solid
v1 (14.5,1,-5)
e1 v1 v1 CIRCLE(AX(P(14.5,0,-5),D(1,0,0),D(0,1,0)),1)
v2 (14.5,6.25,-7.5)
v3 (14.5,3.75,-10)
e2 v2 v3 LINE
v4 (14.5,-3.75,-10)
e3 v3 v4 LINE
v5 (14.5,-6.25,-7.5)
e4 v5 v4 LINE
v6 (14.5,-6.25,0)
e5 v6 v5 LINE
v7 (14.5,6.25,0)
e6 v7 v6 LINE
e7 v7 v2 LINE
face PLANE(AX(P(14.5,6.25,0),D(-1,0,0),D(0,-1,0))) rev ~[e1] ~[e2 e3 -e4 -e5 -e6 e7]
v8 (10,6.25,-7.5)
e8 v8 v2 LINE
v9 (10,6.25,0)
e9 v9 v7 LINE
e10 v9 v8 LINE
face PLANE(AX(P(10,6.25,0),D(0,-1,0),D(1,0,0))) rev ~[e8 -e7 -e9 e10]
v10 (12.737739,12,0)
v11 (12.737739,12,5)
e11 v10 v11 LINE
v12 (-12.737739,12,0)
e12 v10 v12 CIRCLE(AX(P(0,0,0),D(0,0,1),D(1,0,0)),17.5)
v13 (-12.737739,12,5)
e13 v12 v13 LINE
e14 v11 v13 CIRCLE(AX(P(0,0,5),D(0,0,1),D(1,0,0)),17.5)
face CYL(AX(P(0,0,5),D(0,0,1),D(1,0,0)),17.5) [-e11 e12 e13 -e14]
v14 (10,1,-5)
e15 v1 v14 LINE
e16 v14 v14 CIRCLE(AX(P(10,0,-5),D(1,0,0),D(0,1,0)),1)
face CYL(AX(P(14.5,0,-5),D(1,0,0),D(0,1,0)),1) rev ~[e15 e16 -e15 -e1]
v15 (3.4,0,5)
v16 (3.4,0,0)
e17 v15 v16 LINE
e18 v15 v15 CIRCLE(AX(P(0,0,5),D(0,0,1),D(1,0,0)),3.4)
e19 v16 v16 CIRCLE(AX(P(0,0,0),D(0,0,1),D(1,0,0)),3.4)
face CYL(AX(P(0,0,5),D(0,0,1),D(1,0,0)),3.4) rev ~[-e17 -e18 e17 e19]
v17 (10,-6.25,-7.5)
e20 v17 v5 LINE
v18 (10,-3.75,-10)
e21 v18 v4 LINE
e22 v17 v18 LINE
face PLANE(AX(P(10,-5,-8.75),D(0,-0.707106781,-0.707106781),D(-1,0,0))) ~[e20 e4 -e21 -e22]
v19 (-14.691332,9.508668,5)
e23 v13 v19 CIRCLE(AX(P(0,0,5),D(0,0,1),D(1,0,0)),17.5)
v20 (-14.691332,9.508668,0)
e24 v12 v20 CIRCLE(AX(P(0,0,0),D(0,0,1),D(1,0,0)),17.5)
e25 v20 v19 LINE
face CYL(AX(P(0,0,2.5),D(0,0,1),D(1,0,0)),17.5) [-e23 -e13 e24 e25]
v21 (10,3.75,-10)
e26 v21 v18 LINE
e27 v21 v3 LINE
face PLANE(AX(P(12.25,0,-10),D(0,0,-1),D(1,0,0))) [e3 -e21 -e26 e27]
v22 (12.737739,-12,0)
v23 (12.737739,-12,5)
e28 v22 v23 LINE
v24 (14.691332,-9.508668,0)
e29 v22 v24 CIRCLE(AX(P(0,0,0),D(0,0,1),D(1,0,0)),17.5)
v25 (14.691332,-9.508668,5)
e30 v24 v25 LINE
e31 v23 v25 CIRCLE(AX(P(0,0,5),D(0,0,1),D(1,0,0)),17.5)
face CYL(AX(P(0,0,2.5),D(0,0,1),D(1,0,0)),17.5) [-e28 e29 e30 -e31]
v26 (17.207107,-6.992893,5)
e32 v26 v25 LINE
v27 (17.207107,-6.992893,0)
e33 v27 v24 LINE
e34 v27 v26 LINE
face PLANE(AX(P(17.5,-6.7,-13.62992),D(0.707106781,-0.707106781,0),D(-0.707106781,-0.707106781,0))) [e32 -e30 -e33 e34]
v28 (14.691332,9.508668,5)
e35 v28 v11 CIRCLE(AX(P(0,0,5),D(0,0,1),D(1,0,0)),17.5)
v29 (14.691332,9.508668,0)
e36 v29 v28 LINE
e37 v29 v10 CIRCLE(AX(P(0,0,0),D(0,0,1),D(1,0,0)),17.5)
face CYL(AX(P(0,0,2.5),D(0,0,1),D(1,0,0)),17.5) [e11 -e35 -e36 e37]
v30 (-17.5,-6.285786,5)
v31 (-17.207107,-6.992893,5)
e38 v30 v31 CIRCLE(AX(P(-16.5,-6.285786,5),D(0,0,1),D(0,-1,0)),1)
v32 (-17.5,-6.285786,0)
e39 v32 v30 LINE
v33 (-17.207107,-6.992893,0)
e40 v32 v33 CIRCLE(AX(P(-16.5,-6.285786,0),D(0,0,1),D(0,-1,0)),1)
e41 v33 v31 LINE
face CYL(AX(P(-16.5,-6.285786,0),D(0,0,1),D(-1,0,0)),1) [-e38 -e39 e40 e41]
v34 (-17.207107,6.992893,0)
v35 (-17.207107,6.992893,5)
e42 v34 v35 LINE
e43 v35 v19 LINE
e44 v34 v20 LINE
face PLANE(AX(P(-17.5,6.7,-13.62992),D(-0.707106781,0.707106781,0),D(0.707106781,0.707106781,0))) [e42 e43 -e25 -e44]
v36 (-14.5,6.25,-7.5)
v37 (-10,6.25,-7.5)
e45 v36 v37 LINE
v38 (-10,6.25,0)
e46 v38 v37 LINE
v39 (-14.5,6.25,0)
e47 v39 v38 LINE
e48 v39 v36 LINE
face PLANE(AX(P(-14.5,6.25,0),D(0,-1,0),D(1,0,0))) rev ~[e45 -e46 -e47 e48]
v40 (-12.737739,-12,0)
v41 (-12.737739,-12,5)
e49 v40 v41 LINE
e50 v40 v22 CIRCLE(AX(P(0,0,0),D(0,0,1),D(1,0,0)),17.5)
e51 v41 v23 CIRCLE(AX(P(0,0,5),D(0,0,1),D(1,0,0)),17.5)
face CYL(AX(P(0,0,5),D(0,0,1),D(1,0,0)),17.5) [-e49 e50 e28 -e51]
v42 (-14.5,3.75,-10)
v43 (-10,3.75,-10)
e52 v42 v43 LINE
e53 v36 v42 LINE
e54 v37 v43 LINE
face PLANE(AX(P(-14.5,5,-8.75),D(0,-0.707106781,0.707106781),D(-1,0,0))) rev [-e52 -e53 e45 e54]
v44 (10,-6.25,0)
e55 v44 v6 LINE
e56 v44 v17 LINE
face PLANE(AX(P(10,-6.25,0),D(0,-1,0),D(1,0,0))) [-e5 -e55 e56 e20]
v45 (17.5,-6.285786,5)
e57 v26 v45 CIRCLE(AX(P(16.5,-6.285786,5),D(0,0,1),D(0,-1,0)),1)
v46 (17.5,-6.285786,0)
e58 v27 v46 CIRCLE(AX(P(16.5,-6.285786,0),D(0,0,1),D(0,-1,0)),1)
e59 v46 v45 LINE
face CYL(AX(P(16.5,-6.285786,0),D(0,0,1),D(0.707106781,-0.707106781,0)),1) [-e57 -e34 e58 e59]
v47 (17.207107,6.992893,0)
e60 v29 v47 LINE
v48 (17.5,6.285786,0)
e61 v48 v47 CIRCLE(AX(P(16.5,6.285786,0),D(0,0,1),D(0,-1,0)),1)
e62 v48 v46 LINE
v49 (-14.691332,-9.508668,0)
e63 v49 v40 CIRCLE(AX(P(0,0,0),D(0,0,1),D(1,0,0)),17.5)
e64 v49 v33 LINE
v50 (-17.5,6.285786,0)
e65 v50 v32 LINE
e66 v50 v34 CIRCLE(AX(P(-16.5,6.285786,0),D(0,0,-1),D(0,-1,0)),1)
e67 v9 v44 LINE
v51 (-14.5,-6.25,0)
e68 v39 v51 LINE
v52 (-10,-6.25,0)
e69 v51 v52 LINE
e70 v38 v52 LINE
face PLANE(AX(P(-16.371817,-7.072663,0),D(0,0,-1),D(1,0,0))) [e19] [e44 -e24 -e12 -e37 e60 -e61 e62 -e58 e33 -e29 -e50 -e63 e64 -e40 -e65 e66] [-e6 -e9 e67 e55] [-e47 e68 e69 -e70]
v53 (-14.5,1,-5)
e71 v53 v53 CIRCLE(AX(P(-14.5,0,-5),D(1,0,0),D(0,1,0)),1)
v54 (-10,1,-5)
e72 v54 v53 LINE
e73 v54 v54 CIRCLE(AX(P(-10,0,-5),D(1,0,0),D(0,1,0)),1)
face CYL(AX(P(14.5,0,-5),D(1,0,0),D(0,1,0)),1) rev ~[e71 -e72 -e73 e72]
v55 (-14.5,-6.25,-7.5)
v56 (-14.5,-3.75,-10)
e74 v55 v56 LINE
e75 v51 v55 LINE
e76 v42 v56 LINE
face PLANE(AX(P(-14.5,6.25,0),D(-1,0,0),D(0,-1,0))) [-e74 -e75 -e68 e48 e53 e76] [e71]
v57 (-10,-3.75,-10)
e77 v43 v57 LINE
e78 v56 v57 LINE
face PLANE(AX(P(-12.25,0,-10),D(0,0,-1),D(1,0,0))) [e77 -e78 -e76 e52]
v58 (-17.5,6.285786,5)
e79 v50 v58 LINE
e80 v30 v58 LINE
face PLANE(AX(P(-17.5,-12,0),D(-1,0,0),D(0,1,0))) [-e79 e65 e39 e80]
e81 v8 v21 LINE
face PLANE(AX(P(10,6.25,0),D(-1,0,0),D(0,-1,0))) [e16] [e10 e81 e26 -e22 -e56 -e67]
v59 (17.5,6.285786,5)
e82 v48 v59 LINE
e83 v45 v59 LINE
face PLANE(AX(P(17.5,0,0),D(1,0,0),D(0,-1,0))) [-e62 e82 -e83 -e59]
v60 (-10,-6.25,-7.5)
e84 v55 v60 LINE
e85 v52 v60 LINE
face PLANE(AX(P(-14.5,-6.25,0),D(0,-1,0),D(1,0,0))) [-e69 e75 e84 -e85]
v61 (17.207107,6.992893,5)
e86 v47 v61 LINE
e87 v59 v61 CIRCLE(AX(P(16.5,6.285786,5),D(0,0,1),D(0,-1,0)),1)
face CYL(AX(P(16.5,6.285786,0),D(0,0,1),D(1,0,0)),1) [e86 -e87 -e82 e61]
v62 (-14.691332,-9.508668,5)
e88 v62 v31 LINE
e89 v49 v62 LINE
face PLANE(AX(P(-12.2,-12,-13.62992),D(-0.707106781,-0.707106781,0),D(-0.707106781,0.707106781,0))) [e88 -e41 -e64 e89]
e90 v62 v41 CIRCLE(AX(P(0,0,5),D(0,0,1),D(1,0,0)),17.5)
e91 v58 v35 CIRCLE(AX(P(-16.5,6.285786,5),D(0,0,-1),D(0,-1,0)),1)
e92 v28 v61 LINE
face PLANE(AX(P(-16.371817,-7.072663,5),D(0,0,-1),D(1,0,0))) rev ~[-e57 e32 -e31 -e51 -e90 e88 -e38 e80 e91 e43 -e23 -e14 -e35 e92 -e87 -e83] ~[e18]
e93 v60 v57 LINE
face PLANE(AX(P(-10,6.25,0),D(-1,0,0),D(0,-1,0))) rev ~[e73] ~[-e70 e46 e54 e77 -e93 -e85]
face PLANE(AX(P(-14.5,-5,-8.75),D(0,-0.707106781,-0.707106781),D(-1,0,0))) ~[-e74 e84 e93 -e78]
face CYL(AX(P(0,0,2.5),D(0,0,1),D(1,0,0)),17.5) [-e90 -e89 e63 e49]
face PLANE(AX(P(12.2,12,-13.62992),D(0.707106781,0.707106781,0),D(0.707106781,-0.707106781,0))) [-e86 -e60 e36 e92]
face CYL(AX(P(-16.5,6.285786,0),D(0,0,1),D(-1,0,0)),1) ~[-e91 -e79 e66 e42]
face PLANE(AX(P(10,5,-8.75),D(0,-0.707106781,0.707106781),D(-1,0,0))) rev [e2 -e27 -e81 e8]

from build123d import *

# Parameters (mm, degrees)
F1_DEPTH      = 5
F3_SIZE       = 1
F2_W          = 4.5
F2_H          = 12.5
F4_DEPTH      = 10
F5_SIZE       = 2.5
F6_R          = 1
F7_DEPTH      = 39.5010001
F8_R          = 39.5864097355
F8_R_2        = 17.5
F9_DEPTH      = 25
F10_R         = 3.4
F11_DEPTH     = 25
F13_DEPTH     = 5
F14_T4_DEPTH  = 32.2598396724
F14_S5_R      = 17.5
F14_T6_DEPTH  = 18
F14_T10_DEPTH = 32.2598396724
F14_S11_R     = 17.5
F14_T12_DEPTH = 18
F14_T16_DEPTH = 32.2598396724
F14_S17_R     = 17.5
F14_T18_DEPTH = 18
F14_T22_DEPTH = 32.2598396724
F14_S23_R     = 17.5
F14_T24_DEPTH = 18
F15_R         = 1


# Not quite as in the source:
# - a fillet or chamfer that OpenCascade refuses, or shapes differently, is made with other operations: its cross-section is extruded or revolved along the edge and cut away or added


with BuildPart() as f1:
    # F0 (on Top) → F1 (new body)
    with BuildSketch(Plane.XY):
        with BuildLine():
            ThreePointArc((19.8625961196, -15.8301909188), (23.6080012184, -12.5093598908), (25, -7.7012087429))
            Line((25, -7.7012087429), (25, 7.7012087429))
            ThreePointArc((25, 7.7012087429), (23.6080012184, 12.5093598908), (19.8625961196, 15.8301909188))
            add(Edge.make_bspline(
                [(19.8625961196, 15.8301909188), (0, 25.2681728257), (-19.8625961196, 15.8301909188)],
                knots=[0.9132750433, 0.9132750433, 0.9132750433, 2.2283176103, 2.2283176103, 2.2283176103], degree=2, weights=[1, 0.7915095459, 1]))
            ThreePointArc((-19.8625961196, 15.8301909188), (-23.6080012184, 12.5093598908), (-25, 7.7012087429))
            Line((-25, 7.7012087429), (-25, -7.7012087429))
            ThreePointArc((-25, -7.7012087429), (-23.6080012184, -12.5093598908), (-19.8625961196, -15.8301909188))
            add(Edge.make_bspline(
                [(-19.8625961196, -15.8301909188), (0, -25.2681728257), (19.8625961196, -15.8301909188)],
                knots=[4.0548676969, 4.0548676969, 4.0548676969, 5.3699102639, 5.3699102639, 5.3699102639], degree=2, weights=[1, 0.7915095459, 1]))
        make_face()
    extrude(amount=F1_DEPTH)

    # F3
    f3_edges = [f1.edges().sort_by_distance(p)[0] for p in [
        (4e-06, -20, 0),
    ]]
    chamfer(f3_edges, length=F3_SIZE)

    # F2 (on face) → F4 (join)
    with BuildSketch(Plane(origin=(0, 0, 0), x_dir=(1, 0, 0), z_dir=(0, 0, -1))):
        with Locations((12.25, 0)):
            Rectangle(F2_W, F2_H)
        with Locations((-12.25, 0)):
            Rectangle(F2_W, F2_H)
    extrude(amount=F4_DEPTH)

    # F5
    f5_edges = [f1.edges().sort_by_distance(p)[0] for p in [
        (-12.25, -6.25, -10),
        (12.25, -6.25, -10),
        (-12.25, 6.25, -10),
        (12.25, 6.25, -10),
    ]]
    chamfer(f5_edges, length=F5_SIZE)

    # F6 (on face) → F7 (cut, through all)
    with BuildSketch(Plane.YZ.offset(14.5)):
        with Locations((0, -5)):
            Circle(F6_R)
    extrude(amount=-F7_DEPTH, mode=Mode.SUBTRACT)

    # F8 (on face) → F9 (cut)
    with BuildSketch(Plane.XY.offset(5)):
        Circle(F8_R)
        with BuildLine():
            add(Edge.make_bspline(
                [(-19.8625961196, -15.8301909188), (0, -25.2681728257), (19.8625961196, -15.8301909188)],
                knots=[4.0548676969, 4.0548676969, 4.0548676969, 5.3699102639, 5.3699102639, 5.3699102639], degree=2, weights=[1, 0.7915095459, 1]))
            ThreePointArc((-19.8625961196, -15.8301909188), (-23.6080012184, -12.5093598908), (-25, -7.7012087429))
            Line((-25, -7.7012087429), (-25, 7.7012087429))
            ThreePointArc((-25, 7.7012087429), (-23.6080012184, 12.5093598908), (-19.8625961196, 15.8301909188))
            add(Edge.make_bspline(
                [(19.8625961196, 15.8301909188), (0, 25.2681728257), (-19.8625961196, 15.8301909188)],
                knots=[0.9132750433, 0.9132750433, 0.9132750433, 2.2283176103, 2.2283176103, 2.2283176103], degree=2, weights=[1, 0.7915095459, 1]))
            ThreePointArc((19.8625961196, 15.8301909188), (23.6080012184, 12.5093598908), (25, 7.7012087429))
            Line((25, 7.7012087429), (25, -7.7012087429))
            ThreePointArc((25, -7.7012087429), (23.6080012184, -12.5093598908), (19.8625961196, -15.8301909188))
        make_face(mode=Mode.SUBTRACT)
        with BuildLine():
            ThreePointArc((-25, -7.7012087429), (-23.6080012184, -12.5093598908), (-19.8625961196, -15.8301909188))
            add(Edge.make_bspline(
                [(-19.8625961196, -15.8301909188), (0, -25.2681728257), (19.8625961196, -15.8301909188)],
                knots=[4.0548676969, 4.0548676969, 4.0548676969, 5.3699102639, 5.3699102639, 5.3699102639], degree=2, weights=[1, 0.7915095459, 1]))
            ThreePointArc((19.8625961196, -15.8301909188), (23.6080012184, -12.5093598908), (25, -7.7012087429))
            Line((25, -7.7012087429), (25, 7.7012087429))
            ThreePointArc((25, 7.7012087429), (23.6080012184, 12.5093598908), (19.8625961196, 15.8301909188))
            add(Edge.make_bspline(
                [(19.8625961196, 15.8301909188), (0, 25.2681728257), (-19.8625961196, 15.8301909188)],
                knots=[0.9132750433, 0.9132750433, 0.9132750433, 2.2283176103, 2.2283176103, 2.2283176103], degree=2, weights=[1, 0.7915095459, 1]))
            ThreePointArc((-19.8625961196, 15.8301909188), (-23.6080012184, 12.5093598908), (-25, 7.7012087429))
            Line((-25, 7.7012087429), (-25, -7.7012087429))
        make_face()
        Circle(F8_R_2, mode=Mode.SUBTRACT)
    extrude(amount=-F9_DEPTH, mode=Mode.SUBTRACT)

    # F10 (on face) → F11 (cut)
    with BuildSketch(Plane.XY.offset(5)):
        Circle(F10_R)
    extrude(amount=-F11_DEPTH, mode=Mode.SUBTRACT)

    # F12 (on face) → F13 (join)
    with BuildSketch(Plane(origin=(0, 0, 0), x_dir=(1, 0, 0), z_dir=(0, 0, -1))):
        with BuildLine():
            Line((-17.5, 12), (-17.5, -1.86e-08))
            ThreePointArc((-17.5, -1.86e-08), (-16.2659219885, 6.4552135413), (-12.7377392029, 12))
            Line((-12.7377392029, 12), (-17.5, 12))
        make_face()
        with BuildLine():
            ThreePointArc((12.7377392029, 12), (16.2659219851, 6.4552135499), (17.5, 0))
            Line((17.5, 0), (17.5, 12))
            Line((17.5, 12), (12.7377392029, 12))
        make_face()
        with BuildLine():
            Line((12.7377392029, -12), (17.5, -12))
            Line((17.5, -12), (17.5, 0))
            ThreePointArc((17.5, 0), (16.2659219851, -6.4552135499), (12.7377392029, -12))
        make_face()
        with BuildLine():
            Line((-17.5, -12), (-12.7377392029, -12))
            ThreePointArc((-12.7377392029, -12), (-16.2659219817, -6.4552135586), (-17.5, -1.86e-08))
            Line((-17.5, -1.86e-08), (-17.5, -12))
        make_face()
    extrude(amount=-F13_DEPTH)

    # F14: chamfer of 5.3 on 4 edges, made by hand


with BuildPart() as f14_tool2:
    # F14_s3 → F14_t4 (new body)
    with BuildSketch(Plane.XY.offset(-13.6299198362)):
        Polygon((17.5, -6.7), (12.2, -12), (17.5, -12), align=None)
    extrude(amount=F14_T4_DEPTH)

    # F14_s5 → F14_t6 (cut, symmetric)
    with BuildSketch(Plane.XY.offset(2.5)):
        Circle(F14_S5_R)
    extrude(amount=F14_T6_DEPTH, both=True, mode=Mode.SUBTRACT)


with BuildPart() as f1_1:
    add(f1.part)

    # F14_t1: cut F14_tool2
    add(f14_tool2.part, mode=Mode.SUBTRACT)


with BuildPart() as f14_tool8:
    # F14_s9 → F14_t10 (new body)
    with BuildSketch(Plane.XY.offset(-13.6299198362)):
        Polygon((12.2, 12), (17.5, 6.7), (17.5, 12), align=None)
    extrude(amount=F14_T10_DEPTH)

    # F14_s11 → F14_t12 (cut, symmetric)
    with BuildSketch(Plane.XY.offset(2.5)):
        Circle(F14_S11_R)
    extrude(amount=F14_T12_DEPTH, both=True, mode=Mode.SUBTRACT)


with BuildPart() as f1_2:
    add(f1_1.part)

    # F14_t7: cut F14_tool8
    add(f14_tool8.part, mode=Mode.SUBTRACT)


with BuildPart() as f14_tool14:
    # F14_s15 → F14_t16 (new body)
    with BuildSketch(Plane.XY.offset(-13.6299198362)):
        Polygon((-12.2, -12), (-17.5, -6.7), (-17.5, -12), align=None)
    extrude(amount=F14_T16_DEPTH)

    # F14_s17 → F14_t18 (cut, symmetric)
    with BuildSketch(Plane.XY.offset(2.5)):
        Circle(F14_S17_R)
    extrude(amount=F14_T18_DEPTH, both=True, mode=Mode.SUBTRACT)


with BuildPart() as f1_3:
    add(f1_2.part)

    # F14_t13: cut F14_tool14
    add(f14_tool14.part, mode=Mode.SUBTRACT)


with BuildPart() as f14_tool20:
    # F14_s21 → F14_t22 (new body)
    with BuildSketch(Plane.XY.offset(-13.6299198362)):
        Polygon((-17.5, 6.7), (-12.2, 12), (-17.5, 12), align=None)
    extrude(amount=F14_T22_DEPTH)

    # F14_s23 → F14_t24 (cut, symmetric)
    with BuildSketch(Plane.XY.offset(2.5)):
        Circle(F14_S23_R)
    extrude(amount=F14_T24_DEPTH, both=True, mode=Mode.SUBTRACT)


with BuildPart() as f1_4:
    add(f1_3.part)

    # F14_t19: cut F14_tool20
    add(f14_tool20.part, mode=Mode.SUBTRACT)

    # F15
    f15_edges = [f1_4.edges().sort_by_distance(p)[0] for p in [
        (-17.5, -6.7, 2.5),
        (-17.5, 6.7, 2.5),
        (17.5, 6.7, 2.5),
        (17.5, -6.7, 2.5),
    ]]
    fillet(f15_edges, radius=F15_R)


solid = f1_4.part
